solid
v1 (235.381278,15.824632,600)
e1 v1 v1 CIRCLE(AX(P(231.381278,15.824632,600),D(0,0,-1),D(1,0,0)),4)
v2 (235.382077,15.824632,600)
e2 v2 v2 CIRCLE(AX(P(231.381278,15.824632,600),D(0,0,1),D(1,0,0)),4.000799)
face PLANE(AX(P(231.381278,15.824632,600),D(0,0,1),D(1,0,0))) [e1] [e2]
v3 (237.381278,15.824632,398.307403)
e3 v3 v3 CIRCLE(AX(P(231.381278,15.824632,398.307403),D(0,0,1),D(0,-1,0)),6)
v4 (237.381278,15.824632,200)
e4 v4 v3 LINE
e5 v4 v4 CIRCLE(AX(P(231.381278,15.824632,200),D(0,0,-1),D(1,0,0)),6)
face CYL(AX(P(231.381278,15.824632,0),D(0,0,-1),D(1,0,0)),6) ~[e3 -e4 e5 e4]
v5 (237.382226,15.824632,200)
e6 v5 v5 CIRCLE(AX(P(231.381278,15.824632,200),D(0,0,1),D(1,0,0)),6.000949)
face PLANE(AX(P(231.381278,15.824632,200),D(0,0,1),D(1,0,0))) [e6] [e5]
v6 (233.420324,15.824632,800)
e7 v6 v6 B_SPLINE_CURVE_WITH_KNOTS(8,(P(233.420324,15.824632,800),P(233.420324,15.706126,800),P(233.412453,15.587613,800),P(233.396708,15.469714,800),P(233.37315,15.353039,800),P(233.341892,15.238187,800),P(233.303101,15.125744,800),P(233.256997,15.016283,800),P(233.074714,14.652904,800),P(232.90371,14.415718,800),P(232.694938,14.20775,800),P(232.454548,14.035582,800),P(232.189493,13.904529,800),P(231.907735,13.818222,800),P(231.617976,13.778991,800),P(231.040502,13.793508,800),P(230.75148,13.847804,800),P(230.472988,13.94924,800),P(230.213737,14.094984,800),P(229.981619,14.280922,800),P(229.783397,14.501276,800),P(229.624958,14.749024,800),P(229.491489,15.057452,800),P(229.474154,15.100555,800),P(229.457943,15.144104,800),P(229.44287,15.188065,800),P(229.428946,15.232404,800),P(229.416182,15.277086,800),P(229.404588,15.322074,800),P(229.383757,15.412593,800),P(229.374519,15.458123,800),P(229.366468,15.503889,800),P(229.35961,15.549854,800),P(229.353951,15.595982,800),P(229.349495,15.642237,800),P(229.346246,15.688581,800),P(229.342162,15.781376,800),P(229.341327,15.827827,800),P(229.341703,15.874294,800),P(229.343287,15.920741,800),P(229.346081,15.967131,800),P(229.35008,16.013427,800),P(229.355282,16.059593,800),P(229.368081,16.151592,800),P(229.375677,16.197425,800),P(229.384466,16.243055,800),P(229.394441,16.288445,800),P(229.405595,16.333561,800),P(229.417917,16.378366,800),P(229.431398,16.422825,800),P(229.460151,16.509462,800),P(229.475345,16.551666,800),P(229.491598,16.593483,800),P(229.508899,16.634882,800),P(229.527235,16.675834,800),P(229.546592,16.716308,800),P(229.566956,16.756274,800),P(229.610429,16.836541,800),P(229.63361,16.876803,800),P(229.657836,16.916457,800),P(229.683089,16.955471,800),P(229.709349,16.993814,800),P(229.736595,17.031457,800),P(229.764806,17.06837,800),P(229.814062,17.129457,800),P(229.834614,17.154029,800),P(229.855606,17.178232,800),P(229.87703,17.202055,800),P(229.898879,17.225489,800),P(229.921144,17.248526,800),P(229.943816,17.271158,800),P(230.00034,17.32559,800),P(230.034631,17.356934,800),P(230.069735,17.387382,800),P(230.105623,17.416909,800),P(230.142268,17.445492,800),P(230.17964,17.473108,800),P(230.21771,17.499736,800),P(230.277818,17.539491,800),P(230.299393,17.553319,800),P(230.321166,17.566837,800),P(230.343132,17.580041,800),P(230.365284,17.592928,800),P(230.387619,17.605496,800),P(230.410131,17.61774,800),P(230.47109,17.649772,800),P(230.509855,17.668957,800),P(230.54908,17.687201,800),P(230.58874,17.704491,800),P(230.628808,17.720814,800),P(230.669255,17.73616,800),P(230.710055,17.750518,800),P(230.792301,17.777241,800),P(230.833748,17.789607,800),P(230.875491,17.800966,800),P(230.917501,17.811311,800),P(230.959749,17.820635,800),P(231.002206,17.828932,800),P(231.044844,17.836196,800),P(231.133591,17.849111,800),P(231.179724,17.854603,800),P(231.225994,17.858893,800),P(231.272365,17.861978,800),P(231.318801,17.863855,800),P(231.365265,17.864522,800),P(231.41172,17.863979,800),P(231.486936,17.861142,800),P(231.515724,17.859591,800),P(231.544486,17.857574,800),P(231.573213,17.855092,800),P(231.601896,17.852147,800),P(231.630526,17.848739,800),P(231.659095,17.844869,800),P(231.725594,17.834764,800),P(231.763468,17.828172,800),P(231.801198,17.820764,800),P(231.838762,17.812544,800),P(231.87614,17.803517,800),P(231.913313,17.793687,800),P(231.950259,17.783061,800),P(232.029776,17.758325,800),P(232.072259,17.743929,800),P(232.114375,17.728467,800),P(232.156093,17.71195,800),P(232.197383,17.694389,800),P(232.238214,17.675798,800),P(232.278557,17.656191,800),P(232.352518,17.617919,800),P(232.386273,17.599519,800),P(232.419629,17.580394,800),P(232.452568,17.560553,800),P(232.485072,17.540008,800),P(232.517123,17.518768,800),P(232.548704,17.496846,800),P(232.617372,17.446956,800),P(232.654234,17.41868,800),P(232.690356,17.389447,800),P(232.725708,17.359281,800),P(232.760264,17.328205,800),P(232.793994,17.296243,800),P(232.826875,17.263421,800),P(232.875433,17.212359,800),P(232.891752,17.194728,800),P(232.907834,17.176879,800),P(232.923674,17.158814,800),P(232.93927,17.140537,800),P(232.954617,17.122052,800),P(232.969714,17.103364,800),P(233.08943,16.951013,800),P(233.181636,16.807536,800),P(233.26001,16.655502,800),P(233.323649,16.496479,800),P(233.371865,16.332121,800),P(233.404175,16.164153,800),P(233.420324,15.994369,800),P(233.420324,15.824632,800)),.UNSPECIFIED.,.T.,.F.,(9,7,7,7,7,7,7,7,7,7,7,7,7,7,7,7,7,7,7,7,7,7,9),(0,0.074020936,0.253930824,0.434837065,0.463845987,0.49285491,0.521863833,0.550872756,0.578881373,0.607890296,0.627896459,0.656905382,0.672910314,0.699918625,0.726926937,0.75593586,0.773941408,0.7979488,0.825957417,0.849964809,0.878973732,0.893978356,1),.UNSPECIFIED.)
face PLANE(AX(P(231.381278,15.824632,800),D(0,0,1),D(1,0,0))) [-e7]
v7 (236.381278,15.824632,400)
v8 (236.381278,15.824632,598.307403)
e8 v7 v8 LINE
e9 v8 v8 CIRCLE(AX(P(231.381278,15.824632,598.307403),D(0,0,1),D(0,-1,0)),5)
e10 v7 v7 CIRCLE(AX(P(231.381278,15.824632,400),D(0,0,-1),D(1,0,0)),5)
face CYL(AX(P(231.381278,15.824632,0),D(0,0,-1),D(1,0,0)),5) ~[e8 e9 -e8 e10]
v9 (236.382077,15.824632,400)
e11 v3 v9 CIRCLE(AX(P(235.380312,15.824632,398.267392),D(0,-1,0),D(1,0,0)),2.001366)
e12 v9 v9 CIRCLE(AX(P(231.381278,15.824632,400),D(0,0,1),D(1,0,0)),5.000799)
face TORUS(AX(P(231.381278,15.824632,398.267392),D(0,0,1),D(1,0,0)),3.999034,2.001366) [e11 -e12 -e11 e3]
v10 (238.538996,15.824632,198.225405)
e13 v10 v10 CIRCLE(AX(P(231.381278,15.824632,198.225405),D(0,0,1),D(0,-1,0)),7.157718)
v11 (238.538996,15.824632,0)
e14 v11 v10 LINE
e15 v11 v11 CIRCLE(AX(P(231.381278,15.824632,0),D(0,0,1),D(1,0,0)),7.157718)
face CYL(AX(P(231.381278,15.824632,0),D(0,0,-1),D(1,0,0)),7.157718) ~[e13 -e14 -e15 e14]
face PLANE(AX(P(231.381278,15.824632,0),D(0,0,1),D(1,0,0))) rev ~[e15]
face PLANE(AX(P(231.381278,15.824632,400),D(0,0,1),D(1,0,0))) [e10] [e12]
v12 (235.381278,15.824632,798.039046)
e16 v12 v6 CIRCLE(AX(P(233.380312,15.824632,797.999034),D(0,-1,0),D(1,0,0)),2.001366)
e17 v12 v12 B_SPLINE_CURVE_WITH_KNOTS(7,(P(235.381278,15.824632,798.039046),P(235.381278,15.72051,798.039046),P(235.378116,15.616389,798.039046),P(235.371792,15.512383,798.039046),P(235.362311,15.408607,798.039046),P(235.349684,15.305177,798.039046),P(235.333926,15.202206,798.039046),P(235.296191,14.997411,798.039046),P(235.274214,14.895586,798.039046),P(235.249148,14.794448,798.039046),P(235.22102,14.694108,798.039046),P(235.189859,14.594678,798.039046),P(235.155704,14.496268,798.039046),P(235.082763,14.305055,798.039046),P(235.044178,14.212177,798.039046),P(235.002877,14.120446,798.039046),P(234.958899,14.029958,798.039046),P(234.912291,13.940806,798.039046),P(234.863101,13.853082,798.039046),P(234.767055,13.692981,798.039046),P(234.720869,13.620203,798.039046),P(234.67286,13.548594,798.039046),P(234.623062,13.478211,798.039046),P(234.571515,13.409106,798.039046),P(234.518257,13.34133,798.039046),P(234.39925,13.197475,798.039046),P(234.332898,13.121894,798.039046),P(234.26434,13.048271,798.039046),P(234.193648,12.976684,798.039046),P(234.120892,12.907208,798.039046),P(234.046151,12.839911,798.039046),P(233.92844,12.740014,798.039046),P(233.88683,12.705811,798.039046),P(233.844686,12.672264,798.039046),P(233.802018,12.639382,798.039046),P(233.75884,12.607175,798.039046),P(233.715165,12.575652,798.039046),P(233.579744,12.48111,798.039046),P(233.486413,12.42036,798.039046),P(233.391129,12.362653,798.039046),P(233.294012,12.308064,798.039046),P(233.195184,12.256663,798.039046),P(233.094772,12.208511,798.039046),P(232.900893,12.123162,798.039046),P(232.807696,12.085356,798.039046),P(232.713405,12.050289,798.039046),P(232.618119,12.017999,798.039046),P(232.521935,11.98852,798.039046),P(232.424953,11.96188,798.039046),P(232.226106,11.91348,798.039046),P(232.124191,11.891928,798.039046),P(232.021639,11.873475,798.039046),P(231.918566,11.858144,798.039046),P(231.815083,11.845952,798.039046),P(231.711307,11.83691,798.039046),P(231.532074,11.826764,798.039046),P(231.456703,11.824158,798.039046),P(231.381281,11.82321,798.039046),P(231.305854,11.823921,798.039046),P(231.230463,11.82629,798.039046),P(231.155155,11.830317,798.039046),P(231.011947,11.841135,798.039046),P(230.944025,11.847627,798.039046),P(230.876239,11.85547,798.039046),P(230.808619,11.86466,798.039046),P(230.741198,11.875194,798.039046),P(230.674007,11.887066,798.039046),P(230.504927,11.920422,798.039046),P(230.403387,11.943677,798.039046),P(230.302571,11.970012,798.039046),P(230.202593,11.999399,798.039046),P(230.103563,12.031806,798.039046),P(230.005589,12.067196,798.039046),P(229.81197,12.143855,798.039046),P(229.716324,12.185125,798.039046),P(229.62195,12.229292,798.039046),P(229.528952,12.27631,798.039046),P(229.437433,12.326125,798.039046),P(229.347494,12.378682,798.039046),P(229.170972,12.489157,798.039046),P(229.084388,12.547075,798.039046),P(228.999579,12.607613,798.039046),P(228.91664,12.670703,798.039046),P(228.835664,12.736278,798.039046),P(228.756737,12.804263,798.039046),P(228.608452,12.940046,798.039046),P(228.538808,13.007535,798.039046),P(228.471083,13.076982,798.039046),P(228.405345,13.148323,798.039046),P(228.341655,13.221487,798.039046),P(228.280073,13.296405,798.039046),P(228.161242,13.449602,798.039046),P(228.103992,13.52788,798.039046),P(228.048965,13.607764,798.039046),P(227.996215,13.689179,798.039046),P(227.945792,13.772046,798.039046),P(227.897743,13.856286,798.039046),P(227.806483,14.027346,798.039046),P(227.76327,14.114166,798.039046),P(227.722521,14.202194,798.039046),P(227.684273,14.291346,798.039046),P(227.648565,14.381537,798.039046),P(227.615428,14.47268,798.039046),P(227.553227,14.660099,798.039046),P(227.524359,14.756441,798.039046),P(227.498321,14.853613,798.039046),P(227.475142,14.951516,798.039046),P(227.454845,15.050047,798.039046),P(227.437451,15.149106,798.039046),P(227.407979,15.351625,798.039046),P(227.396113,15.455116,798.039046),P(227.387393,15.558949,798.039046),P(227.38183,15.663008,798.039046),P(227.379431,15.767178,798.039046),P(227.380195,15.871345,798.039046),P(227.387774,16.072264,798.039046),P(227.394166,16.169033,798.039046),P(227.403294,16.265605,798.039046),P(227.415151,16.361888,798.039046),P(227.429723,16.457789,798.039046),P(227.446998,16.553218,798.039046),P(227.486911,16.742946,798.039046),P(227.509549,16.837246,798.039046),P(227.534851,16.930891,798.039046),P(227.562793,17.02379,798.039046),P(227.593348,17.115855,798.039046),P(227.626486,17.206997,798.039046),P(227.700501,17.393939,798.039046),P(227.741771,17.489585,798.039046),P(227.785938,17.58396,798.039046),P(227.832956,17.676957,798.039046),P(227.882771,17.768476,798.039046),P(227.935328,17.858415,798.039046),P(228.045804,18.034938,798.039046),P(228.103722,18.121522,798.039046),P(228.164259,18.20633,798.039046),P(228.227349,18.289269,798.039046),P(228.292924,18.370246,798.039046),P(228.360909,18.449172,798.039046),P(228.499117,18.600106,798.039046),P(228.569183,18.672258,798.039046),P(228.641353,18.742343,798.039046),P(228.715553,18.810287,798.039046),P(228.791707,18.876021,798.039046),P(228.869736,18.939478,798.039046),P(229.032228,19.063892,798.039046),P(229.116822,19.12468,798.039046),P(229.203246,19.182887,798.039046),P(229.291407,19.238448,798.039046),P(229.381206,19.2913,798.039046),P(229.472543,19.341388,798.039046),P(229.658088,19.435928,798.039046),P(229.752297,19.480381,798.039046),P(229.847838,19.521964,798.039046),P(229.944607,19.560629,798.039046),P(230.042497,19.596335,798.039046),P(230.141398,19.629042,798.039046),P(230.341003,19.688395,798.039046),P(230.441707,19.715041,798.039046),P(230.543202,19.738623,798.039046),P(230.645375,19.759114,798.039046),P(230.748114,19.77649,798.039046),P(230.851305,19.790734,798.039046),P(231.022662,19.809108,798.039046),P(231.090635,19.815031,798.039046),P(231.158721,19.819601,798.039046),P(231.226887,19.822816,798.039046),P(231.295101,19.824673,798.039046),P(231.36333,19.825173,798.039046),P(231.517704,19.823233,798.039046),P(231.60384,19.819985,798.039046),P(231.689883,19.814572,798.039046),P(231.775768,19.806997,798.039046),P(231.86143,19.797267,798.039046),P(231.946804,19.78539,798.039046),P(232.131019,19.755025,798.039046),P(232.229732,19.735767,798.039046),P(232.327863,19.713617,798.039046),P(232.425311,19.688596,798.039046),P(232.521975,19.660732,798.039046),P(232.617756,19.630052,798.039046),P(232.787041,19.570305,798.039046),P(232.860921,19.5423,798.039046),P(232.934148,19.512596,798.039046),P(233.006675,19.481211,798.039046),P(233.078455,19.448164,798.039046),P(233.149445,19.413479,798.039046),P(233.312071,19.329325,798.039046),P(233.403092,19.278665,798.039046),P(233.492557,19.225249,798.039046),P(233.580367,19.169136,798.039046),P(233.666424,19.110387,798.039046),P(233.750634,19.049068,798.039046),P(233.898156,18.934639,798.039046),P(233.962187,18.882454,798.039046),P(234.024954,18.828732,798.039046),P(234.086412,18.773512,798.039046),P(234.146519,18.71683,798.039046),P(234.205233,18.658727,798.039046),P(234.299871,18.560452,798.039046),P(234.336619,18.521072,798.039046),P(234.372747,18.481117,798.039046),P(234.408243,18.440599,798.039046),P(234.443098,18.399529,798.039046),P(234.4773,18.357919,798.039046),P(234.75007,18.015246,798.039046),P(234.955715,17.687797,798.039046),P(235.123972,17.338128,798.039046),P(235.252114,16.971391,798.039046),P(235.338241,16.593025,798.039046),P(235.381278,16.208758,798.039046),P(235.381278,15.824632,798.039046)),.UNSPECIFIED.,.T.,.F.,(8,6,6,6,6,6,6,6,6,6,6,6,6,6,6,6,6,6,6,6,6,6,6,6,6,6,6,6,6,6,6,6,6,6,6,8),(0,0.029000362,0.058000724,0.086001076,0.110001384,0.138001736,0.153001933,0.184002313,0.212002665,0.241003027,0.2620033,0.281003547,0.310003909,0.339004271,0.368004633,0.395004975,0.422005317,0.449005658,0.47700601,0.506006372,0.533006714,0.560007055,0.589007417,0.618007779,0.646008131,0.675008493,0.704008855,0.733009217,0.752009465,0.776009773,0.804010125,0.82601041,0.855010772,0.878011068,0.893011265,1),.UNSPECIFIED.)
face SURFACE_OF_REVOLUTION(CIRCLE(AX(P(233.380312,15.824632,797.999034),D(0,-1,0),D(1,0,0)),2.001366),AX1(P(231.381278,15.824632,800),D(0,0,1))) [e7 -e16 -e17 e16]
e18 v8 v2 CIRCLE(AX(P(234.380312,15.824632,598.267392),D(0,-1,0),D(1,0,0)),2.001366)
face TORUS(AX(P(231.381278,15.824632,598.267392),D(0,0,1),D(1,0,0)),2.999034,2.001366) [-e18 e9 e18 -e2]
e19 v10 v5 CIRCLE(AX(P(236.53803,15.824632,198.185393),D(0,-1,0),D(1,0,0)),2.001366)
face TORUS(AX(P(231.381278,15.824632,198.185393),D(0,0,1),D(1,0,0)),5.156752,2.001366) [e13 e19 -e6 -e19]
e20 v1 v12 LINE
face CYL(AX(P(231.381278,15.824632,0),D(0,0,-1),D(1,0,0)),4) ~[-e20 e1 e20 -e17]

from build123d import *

# Parameters (mm, degrees)
F0_R     = 7.1577178439
F0_R_2   = 6
F0_R_3   = 5
F0_R_4   = 4
F1_DEPTH = 200
F2_DEPTH = 400
F3_DEPTH = 600
F4_DEPTH = 800


# Not quite as in the source:
# - a fillet or chamfer that OpenCascade refuses, or shapes differently, is made with other operations: its cross-section is extruded or revolved along the edge and cut away or added


with BuildPart() as f1:
    # F0 (on Top) → F1 (new body)
    with BuildSketch(Plane.XY):
        with Locations((231.38127774, 15.8246317059)):
            Circle(F0_R)
        with Locations((231.38127774, 15.8246317059)):
            Circle(F0_R_2, mode=Mode.SUBTRACT)
        with Locations((231.38127774, 15.8246317059)):
            Circle(F0_R_2)
        with Locations((231.38127774, 15.8246317059)):
            Circle(F0_R_3, mode=Mode.SUBTRACT)
        with Locations((231.38127774, 15.8246317059)):
            Circle(F0_R_3)
        with Locations((231.38127774, 15.8246317059)):
            Circle(F0_R_4, mode=Mode.SUBTRACT)
        with Locations((231.38127774, 15.8246317059)):
            Circle(F0_R_4)
    extrude(amount=F1_DEPTH)

    # F0 (on Top) → F2 (join)
    with BuildSketch(Plane.XY):
        with Locations((231.38127774, 15.8246317059)):
            Circle(F0_R_2)
        with Locations((231.38127774, 15.8246317059)):
            Circle(F0_R_3, mode=Mode.SUBTRACT)
        with Locations((231.38127774, 15.8246317059)):
            Circle(F0_R_3)
        with Locations((231.38127774, 15.8246317059)):
            Circle(F0_R_4, mode=Mode.SUBTRACT)
        with Locations((231.38127774, 15.8246317059)):
            Circle(F0_R_4)
    extrude(amount=F2_DEPTH)

    # F0 (on Top) → F3 (join)
    with BuildSketch(Plane.XY):
        with Locations((231.38127774, 15.8246317059)):
            Circle(F0_R_3)
        with Locations((231.38127774, 15.8246317059)):
            Circle(F0_R_4, mode=Mode.SUBTRACT)
        with Locations((231.38127774, 15.8246317059)):
            Circle(F0_R_4)
    extrude(amount=F3_DEPTH)

    # F0 (on Top) → F4 (join)
    with BuildSketch(Plane.XY):
        with Locations((231.38127774, 15.8246317059)):
            Circle(F0_R_4)
    extrude(amount=F4_DEPTH)

    # F5: fillet of radius 2 on 4 edges, made by hand

    # F5_s1 → F5_t2 (revolve, cut)
    with BuildSketch(Plane.XZ.offset(-15.8246317059)):
        with BuildLine():
            ThreePointArc((238.5393955839, 198.1853934994), (238.2252538415, 199.261841349), (237.3814463082, 200.0003627462))
            Line((237.3814463082, 200.0003627462), (237.4657879491, 200.1818596708))
            ThreePointArc((237.4657879491, 200.1818596708), (237.9602209461, 200.2001365685), (238.5389955839, 200.2001365685))
            Line((238.5389955839, 200.2001365685), (238.7391321525, 200))
            ThreePointArc((238.7391321525, 200), (238.7391321525, 199.0926967497), (238.7395321525, 198.1853934994))
            Line((238.7395321525, 198.1853934994), (238.5393955839, 198.1853934994))
        make_face()
    revolve(axis=Axis((231.38127774, 15.8246317059, 200), (0, 0, 1)), mode=Mode.SUBTRACT)

    # F5_s3 → F5_t4 (revolve, cut)
    with BuildSketch(Plane.XZ.offset(-15.8246317059)):
        with BuildLine():
            ThreePointArc((237.38167774, 398.2673917434), (237.1136849874, 399.2678330874), (236.3814778365, 400.0003463544))
            Line((236.3814778365, 400.0003463544), (236.4815944147, 400.1736418155))
            ThreePointArc((236.4815944147, 400.1736418155), (236.8813777883, 400.2001365685), (237.38127774, 400.2001365685))
            Line((237.38127774, 400.2001365685), (237.5814143085, 400))
            ThreePointArc((237.5814143085, 400), (237.5814143085, 399.1336958717), (237.5818143085, 398.2673917434))
            Line((237.5818143085, 398.2673917434), (237.38167774, 398.2673917434))
        make_face()
    revolve(axis=Axis((231.38127774, 15.8246317059, 400), (0, 0, 1)), mode=Mode.SUBTRACT)

    # F5_s5 → F5_t6 (revolve, cut)
    with BuildSketch(Plane.XZ.offset(-15.8246317059)):
        with BuildLine():
            ThreePointArc((236.38167774, 598.2673917434), (236.1136849874, 599.2678330874), (235.3814778365, 600.0003463544))
            Line((235.3814778365, 600.0003463544), (235.4815944147, 600.1736418155))
            ThreePointArc((235.4815944147, 600.1736418155), (235.8813777883, 600.2001365685), (236.38127774, 600.2001365685))
            Line((236.38127774, 600.2001365685), (236.5814143085, 600))
            ThreePointArc((236.5814143085, 600), (236.5814143085, 599.1336958717), (236.5818143085, 598.2673917434))
            Line((236.5818143085, 598.2673917434), (236.38167774, 598.2673917434))
        make_face()
    revolve(axis=Axis((231.38127774, 15.8246317059, 600), (0, 0, 1)), mode=Mode.SUBTRACT)

    # F5_s7 → F5_t8 (revolve, cut)
    with BuildSketch(Plane.XZ.offset(-15.8246317059)):
        with BuildLine():
            ThreePointArc((235.38167774, 797.9990343146), (234.7954913024, 799.4142135624), (233.3803120546, 800.0004))
            Line((233.3803120546, 800.0004), (233.3803120546, 800.2005365685))
            ThreePointArc((233.3803120546, 800.2005365685), (234.3807948973, 800.2001365685), (235.38127774, 800.2001365685))
            Line((235.38127774, 800.2001365685), (235.5814143085, 800))
            ThreePointArc((235.5814143085, 800), (235.5814143085, 798.9995171573), (235.5818143085, 797.9990343146))
            Line((235.5818143085, 797.9990343146), (235.38167774, 797.9990343146))
        make_face()
    revolve(axis=Axis((231.38127774, 15.8246317059, 800), (0, 0, 1)), mode=Mode.SUBTRACT)


solid = f1.part
